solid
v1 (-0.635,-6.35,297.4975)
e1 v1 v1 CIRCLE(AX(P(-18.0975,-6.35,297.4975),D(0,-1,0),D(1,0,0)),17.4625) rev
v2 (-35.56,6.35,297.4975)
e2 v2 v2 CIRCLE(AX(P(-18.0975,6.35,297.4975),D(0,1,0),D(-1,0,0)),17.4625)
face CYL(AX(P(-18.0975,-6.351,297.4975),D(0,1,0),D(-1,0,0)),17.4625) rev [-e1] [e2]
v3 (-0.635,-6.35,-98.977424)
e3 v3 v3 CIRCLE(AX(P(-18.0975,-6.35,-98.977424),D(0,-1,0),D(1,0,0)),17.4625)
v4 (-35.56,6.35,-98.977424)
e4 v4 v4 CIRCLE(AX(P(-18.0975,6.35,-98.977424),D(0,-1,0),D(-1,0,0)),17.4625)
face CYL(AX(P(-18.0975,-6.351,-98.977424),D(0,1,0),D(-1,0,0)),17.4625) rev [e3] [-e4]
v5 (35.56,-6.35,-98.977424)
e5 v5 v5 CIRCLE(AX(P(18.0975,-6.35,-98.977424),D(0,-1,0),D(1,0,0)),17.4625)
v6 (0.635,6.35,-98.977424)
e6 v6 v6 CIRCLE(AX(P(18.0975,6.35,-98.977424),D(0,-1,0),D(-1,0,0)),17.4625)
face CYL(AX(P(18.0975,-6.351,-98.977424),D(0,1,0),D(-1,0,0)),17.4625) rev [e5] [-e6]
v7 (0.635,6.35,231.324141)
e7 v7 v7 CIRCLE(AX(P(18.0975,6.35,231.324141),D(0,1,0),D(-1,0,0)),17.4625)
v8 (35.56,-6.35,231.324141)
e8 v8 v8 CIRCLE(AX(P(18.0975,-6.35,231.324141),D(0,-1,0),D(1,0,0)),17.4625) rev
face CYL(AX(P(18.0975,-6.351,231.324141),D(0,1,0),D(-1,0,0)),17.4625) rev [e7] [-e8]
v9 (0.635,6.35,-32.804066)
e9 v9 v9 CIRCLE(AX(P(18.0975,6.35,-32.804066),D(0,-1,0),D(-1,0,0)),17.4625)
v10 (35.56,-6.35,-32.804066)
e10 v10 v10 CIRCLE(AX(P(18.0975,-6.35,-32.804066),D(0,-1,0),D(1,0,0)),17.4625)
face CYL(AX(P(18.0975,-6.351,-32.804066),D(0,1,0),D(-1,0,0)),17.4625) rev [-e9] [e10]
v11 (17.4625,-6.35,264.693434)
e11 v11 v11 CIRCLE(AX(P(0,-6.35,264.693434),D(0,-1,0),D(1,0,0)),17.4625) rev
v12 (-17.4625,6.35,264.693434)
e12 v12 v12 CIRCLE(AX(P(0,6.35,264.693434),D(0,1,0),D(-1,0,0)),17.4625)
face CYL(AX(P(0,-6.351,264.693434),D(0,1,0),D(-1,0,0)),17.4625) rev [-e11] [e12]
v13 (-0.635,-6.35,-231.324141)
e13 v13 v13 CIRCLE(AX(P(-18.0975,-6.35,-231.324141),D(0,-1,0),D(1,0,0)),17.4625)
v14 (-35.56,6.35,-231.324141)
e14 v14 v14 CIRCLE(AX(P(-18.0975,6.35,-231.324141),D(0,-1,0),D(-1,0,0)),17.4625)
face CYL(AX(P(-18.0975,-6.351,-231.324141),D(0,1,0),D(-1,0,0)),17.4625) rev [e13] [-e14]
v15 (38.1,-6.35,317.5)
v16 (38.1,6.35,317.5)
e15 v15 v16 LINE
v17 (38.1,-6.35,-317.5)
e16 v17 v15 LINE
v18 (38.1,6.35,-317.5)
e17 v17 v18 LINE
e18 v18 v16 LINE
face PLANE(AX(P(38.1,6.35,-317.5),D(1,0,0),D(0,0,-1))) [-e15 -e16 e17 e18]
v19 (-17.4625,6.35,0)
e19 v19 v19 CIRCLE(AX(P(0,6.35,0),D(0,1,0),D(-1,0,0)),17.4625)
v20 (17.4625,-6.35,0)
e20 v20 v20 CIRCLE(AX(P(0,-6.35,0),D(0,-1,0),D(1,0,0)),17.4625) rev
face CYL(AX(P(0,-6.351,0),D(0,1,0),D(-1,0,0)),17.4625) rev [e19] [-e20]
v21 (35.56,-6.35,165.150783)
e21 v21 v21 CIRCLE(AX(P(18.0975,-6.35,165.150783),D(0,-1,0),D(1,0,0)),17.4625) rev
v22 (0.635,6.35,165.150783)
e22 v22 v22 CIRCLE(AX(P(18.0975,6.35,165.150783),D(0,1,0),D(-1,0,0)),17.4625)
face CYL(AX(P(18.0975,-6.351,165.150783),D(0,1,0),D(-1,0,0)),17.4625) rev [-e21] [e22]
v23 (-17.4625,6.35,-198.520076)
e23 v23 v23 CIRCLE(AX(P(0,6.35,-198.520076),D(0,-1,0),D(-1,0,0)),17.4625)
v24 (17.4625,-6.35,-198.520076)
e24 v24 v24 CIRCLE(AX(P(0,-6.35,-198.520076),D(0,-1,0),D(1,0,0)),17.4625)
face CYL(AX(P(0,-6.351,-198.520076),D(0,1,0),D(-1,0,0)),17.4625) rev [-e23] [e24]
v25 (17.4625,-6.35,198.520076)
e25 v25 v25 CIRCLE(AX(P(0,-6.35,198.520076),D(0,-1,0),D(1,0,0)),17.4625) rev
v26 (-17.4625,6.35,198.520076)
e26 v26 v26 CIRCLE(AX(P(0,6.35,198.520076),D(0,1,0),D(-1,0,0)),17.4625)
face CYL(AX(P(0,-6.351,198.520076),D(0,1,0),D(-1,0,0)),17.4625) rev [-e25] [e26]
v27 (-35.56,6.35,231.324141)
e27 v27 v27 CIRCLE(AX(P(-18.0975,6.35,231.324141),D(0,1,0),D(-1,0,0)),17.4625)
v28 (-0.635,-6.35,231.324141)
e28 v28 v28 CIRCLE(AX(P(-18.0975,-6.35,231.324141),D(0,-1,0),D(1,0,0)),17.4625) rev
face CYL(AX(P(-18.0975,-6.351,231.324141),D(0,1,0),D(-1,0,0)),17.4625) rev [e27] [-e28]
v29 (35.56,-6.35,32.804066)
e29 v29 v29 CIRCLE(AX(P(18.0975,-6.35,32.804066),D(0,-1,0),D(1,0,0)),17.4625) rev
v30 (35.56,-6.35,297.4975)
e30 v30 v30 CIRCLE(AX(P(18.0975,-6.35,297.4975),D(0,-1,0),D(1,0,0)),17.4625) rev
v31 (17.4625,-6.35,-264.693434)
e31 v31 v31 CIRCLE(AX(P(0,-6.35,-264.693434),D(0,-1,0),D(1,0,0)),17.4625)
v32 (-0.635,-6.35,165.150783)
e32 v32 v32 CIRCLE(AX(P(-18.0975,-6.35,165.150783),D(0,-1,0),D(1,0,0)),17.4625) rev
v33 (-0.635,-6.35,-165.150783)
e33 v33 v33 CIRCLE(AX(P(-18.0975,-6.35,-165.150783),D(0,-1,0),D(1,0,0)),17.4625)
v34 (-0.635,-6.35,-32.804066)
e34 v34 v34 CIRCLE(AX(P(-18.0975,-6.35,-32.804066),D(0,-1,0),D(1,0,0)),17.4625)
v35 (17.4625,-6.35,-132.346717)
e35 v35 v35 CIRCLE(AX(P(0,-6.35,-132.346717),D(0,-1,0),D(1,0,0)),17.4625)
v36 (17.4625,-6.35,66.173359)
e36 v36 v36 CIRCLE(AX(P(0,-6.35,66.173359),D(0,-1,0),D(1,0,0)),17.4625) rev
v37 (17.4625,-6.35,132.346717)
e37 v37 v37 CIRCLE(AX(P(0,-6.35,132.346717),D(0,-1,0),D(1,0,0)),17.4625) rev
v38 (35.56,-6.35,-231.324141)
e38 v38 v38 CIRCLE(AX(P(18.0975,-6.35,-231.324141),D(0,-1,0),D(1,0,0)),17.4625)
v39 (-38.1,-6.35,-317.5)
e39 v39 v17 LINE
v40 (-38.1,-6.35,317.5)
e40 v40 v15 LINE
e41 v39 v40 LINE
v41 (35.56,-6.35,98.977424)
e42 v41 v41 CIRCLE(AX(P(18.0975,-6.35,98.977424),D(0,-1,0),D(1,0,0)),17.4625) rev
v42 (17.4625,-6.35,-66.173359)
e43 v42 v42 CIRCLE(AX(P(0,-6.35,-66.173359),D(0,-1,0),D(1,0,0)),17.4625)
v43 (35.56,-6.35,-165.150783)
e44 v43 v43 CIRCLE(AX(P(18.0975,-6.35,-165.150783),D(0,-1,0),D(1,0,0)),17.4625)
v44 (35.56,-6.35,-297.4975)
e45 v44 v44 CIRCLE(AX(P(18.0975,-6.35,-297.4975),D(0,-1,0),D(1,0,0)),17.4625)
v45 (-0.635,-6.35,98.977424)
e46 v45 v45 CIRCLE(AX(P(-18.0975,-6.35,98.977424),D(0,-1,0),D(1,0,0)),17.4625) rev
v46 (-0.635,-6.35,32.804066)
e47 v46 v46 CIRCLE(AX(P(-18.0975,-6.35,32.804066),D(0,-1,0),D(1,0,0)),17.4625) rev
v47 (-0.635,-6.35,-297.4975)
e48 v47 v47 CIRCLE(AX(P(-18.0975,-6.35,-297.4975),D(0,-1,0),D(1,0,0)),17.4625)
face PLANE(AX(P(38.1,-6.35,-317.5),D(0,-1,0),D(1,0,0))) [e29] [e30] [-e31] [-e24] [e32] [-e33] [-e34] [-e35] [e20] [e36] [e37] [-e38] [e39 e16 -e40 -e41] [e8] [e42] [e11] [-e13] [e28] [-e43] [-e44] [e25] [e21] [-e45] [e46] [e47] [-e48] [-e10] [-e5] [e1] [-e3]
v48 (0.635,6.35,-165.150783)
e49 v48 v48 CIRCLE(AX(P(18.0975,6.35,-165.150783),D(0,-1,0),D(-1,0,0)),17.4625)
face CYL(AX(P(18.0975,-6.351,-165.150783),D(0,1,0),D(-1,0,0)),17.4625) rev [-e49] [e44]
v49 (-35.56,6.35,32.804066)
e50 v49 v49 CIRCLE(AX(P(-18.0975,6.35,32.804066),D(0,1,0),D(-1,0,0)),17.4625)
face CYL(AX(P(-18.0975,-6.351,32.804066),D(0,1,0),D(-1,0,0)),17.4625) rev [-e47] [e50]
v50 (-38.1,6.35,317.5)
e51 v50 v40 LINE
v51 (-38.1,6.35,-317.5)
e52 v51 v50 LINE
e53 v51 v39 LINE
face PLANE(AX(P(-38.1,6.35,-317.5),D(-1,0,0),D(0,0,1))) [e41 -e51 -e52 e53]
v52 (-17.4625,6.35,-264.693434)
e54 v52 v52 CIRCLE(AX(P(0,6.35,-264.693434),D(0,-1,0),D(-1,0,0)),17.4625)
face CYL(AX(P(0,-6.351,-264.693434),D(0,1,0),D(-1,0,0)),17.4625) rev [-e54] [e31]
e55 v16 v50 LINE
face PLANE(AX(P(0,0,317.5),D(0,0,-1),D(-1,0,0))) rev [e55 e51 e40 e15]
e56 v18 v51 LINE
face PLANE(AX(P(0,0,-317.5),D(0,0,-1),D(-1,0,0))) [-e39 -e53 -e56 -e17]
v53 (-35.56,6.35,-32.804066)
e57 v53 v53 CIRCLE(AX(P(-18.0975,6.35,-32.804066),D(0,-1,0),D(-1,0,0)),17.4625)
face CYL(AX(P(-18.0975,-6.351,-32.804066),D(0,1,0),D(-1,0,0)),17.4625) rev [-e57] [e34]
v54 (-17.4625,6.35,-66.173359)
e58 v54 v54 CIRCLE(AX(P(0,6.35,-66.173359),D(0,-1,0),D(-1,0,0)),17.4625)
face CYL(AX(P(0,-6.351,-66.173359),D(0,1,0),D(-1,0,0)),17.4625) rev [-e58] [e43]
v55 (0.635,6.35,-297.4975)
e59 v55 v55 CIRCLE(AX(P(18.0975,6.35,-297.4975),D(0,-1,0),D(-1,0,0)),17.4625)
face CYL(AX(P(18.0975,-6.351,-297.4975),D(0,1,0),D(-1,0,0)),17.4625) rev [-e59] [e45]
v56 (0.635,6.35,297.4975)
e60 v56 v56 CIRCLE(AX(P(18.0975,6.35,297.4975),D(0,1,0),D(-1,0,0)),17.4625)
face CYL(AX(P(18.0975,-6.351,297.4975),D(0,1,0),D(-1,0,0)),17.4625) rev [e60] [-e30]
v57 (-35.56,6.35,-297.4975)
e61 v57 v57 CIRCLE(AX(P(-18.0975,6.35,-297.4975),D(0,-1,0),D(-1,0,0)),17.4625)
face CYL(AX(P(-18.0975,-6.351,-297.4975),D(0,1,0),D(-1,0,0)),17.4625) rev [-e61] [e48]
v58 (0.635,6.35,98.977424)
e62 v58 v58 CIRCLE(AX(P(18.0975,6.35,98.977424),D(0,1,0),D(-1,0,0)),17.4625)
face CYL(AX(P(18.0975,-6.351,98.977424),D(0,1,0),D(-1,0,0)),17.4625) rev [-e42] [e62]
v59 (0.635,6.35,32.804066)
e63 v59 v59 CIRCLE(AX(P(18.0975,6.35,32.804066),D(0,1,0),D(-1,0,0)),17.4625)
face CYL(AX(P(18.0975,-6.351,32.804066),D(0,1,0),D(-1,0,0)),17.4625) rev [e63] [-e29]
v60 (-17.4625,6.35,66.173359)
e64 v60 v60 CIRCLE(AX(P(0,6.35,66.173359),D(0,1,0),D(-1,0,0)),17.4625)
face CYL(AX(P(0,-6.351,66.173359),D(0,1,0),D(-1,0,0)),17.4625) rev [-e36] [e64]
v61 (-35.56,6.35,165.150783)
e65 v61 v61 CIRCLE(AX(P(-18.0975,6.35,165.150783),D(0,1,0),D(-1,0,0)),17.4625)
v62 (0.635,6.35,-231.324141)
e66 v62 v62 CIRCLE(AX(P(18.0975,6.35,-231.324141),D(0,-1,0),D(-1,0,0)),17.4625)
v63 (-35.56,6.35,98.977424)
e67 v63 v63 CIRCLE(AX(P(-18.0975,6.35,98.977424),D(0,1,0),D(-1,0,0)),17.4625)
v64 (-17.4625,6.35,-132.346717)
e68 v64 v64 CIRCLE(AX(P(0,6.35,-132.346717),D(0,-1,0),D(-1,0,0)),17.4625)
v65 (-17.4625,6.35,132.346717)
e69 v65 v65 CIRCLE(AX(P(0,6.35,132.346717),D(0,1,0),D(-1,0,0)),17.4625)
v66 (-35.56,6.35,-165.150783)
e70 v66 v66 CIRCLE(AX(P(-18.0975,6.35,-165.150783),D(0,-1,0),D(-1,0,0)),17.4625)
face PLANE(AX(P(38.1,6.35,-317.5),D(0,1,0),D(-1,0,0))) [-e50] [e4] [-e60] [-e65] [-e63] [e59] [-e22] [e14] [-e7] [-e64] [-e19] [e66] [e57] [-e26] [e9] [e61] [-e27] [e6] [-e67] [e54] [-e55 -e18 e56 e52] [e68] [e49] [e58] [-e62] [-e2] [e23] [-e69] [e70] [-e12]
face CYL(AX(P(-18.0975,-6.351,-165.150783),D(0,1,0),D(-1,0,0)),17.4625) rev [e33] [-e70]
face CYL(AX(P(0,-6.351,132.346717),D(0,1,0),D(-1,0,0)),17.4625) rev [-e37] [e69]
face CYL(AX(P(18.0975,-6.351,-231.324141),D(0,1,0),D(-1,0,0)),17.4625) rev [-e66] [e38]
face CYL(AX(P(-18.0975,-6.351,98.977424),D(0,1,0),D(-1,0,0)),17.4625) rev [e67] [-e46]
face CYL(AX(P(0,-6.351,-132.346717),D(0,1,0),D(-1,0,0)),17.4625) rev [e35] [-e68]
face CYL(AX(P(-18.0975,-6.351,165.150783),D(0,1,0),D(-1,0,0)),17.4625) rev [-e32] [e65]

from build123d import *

# Parameters (mm, degrees)
SKETCH1_W           = 76.2
SKETCH1_H           = 12.7
BOSS_EXTRUDE1_DEPTH = 317.5
CUT_EXTRUDE1_REACH  = 322.03
SKETCH2_R           = 17.4625
LPATTERN1_COUNT     = 5
LPATTERN1_PITCH     = 66.173358604
MIRROR1_START       = -6.35
MIRROR1_OUTLINE_R   = 17.4625
MIRROR1_DEPTH       = 12.7


# Read off the part's stored shape, not the designer's step: Mirror1
with BuildPart() as part:
    # Sketch1 → Boss-Extrude1 (new, symmetric)
    with BuildSketch(Plane.XY):
        Rectangle(SKETCH1_W, SKETCH1_H)
    extrude(amount=BOSS_EXTRUDE1_DEPTH, both=True)

    # Sketch2 → Cut-Extrude1 (cut, up to next)
    with BuildSketch(Plane(origin=(0, 6.35, 0), x_dir=(1, 0, 0), z_dir=(0, 1, 0)), mode=Mode.PRIVATE) as cut_extrude1_sk1:
        with Locations(Location((-18.0975, -297.4975, 0), (0, 0, 180))):
            Circle(SKETCH2_R)
    cut_extrude1_tool1 = extrude(cut_extrude1_sk1.sketch, amount=-CUT_EXTRUDE1_REACH, mode=Mode.PRIVATE) & part.part
    # Sketch2 → Cut-Extrude1 (cut, up to next)
    with BuildSketch(Plane(origin=(0, 6.35, 0), x_dir=(1, 0, 0), z_dir=(0, 1, 0)), mode=Mode.PRIVATE) as cut_extrude1_sk2:
        with Locations(Location((0, -264.693434417, 0), (0, 0, 180))):
            Circle(SKETCH2_R)
    cut_extrude1_tool2 = extrude(cut_extrude1_sk2.sketch, amount=-CUT_EXTRUDE1_REACH, mode=Mode.PRIVATE) & part.part
    # Sketch2 → Cut-Extrude1 (cut, up to next)
    with BuildSketch(Plane(origin=(0, 6.35, 0), x_dir=(1, 0, 0), z_dir=(0, 1, 0)), mode=Mode.PRIVATE) as cut_extrude1_sk3:
        with Locations(Location((18.0975, -297.4975, 0), (0, 0, 180))):
            Circle(SKETCH2_R)
    cut_extrude1_tool3 = extrude(cut_extrude1_sk3.sketch, amount=-CUT_EXTRUDE1_REACH, mode=Mode.PRIVATE) & part.part
    cut_extrude1_1 = cut_extrude1_tool1.solids().sort_by_distance((-18.0975, 6.35, 297.4975))[0]
    add(cut_extrude1_1, mode=Mode.SUBTRACT)
    cut_extrude1_2 = cut_extrude1_tool2.solids().sort_by_distance((0, 6.35, 264.693434))[0]
    add(cut_extrude1_2, mode=Mode.SUBTRACT)
    cut_extrude1_3 = cut_extrude1_tool3.solids().sort_by_distance((18.0975, 6.35, 297.4975))[0]
    add(cut_extrude1_3, mode=Mode.SUBTRACT)
    cut_extrude1 = cut_extrude1_1 + cut_extrude1_2 + cut_extrude1_3  # Cut-Extrude1 as one shape, for the pattern or mirror that repeats it

    # LPattern1: Cut-Extrude1 ×5
    with Locations(*[(0, 0, -i * LPATTERN1_PITCH) for i in range(1, LPATTERN1_COUNT)]):
        add(cut_extrude1, mode=Mode.SUBTRACT)

    # Mirror1 outline → Mirror1 (cut)
    with BuildSketch(Plane(origin=(0, 0, 0), x_dir=(1, 0, 0), z_dir=(0, 1, 0)).offset(MIRROR1_START)):
        with Locations((-18.0975, 297.4975)):
            Circle(MIRROR1_OUTLINE_R)
        with Locations((-18.0975, 32.804065583)):
            Circle(MIRROR1_OUTLINE_R)
        with Locations((18.0975, 98.977424187)):
            Circle(MIRROR1_OUTLINE_R)
        with Locations((-18.0975, 98.977424187)):
            Circle(MIRROR1_OUTLINE_R)
        with Locations((0, 66.173358604)):
            Circle(MIRROR1_OUTLINE_R)
        with Locations((18.0975, 32.804065583)):
            Circle(MIRROR1_OUTLINE_R)
        with Locations((-18.0975, 231.324141396)):
            Circle(MIRROR1_OUTLINE_R)
        with Locations((0, 198.520075813)):
            Circle(MIRROR1_OUTLINE_R)
        with Locations((0, 264.693434417)):
            Circle(MIRROR1_OUTLINE_R)
        with Locations((18.0975, 297.4975)):
            Circle(MIRROR1_OUTLINE_R)
        with Locations((0, 132.346717209)):
            Circle(MIRROR1_OUTLINE_R)
        with Locations((18.0975, 165.150782791)):
            Circle(MIRROR1_OUTLINE_R)
        with Locations((-18.0975, 165.150782791)):
            Circle(MIRROR1_OUTLINE_R)
        with Locations((18.0975, 231.324141396)):
            Circle(MIRROR1_OUTLINE_R)
    extrude(amount=MIRROR1_DEPTH, mode=Mode.SUBTRACT)


solid = part.part
